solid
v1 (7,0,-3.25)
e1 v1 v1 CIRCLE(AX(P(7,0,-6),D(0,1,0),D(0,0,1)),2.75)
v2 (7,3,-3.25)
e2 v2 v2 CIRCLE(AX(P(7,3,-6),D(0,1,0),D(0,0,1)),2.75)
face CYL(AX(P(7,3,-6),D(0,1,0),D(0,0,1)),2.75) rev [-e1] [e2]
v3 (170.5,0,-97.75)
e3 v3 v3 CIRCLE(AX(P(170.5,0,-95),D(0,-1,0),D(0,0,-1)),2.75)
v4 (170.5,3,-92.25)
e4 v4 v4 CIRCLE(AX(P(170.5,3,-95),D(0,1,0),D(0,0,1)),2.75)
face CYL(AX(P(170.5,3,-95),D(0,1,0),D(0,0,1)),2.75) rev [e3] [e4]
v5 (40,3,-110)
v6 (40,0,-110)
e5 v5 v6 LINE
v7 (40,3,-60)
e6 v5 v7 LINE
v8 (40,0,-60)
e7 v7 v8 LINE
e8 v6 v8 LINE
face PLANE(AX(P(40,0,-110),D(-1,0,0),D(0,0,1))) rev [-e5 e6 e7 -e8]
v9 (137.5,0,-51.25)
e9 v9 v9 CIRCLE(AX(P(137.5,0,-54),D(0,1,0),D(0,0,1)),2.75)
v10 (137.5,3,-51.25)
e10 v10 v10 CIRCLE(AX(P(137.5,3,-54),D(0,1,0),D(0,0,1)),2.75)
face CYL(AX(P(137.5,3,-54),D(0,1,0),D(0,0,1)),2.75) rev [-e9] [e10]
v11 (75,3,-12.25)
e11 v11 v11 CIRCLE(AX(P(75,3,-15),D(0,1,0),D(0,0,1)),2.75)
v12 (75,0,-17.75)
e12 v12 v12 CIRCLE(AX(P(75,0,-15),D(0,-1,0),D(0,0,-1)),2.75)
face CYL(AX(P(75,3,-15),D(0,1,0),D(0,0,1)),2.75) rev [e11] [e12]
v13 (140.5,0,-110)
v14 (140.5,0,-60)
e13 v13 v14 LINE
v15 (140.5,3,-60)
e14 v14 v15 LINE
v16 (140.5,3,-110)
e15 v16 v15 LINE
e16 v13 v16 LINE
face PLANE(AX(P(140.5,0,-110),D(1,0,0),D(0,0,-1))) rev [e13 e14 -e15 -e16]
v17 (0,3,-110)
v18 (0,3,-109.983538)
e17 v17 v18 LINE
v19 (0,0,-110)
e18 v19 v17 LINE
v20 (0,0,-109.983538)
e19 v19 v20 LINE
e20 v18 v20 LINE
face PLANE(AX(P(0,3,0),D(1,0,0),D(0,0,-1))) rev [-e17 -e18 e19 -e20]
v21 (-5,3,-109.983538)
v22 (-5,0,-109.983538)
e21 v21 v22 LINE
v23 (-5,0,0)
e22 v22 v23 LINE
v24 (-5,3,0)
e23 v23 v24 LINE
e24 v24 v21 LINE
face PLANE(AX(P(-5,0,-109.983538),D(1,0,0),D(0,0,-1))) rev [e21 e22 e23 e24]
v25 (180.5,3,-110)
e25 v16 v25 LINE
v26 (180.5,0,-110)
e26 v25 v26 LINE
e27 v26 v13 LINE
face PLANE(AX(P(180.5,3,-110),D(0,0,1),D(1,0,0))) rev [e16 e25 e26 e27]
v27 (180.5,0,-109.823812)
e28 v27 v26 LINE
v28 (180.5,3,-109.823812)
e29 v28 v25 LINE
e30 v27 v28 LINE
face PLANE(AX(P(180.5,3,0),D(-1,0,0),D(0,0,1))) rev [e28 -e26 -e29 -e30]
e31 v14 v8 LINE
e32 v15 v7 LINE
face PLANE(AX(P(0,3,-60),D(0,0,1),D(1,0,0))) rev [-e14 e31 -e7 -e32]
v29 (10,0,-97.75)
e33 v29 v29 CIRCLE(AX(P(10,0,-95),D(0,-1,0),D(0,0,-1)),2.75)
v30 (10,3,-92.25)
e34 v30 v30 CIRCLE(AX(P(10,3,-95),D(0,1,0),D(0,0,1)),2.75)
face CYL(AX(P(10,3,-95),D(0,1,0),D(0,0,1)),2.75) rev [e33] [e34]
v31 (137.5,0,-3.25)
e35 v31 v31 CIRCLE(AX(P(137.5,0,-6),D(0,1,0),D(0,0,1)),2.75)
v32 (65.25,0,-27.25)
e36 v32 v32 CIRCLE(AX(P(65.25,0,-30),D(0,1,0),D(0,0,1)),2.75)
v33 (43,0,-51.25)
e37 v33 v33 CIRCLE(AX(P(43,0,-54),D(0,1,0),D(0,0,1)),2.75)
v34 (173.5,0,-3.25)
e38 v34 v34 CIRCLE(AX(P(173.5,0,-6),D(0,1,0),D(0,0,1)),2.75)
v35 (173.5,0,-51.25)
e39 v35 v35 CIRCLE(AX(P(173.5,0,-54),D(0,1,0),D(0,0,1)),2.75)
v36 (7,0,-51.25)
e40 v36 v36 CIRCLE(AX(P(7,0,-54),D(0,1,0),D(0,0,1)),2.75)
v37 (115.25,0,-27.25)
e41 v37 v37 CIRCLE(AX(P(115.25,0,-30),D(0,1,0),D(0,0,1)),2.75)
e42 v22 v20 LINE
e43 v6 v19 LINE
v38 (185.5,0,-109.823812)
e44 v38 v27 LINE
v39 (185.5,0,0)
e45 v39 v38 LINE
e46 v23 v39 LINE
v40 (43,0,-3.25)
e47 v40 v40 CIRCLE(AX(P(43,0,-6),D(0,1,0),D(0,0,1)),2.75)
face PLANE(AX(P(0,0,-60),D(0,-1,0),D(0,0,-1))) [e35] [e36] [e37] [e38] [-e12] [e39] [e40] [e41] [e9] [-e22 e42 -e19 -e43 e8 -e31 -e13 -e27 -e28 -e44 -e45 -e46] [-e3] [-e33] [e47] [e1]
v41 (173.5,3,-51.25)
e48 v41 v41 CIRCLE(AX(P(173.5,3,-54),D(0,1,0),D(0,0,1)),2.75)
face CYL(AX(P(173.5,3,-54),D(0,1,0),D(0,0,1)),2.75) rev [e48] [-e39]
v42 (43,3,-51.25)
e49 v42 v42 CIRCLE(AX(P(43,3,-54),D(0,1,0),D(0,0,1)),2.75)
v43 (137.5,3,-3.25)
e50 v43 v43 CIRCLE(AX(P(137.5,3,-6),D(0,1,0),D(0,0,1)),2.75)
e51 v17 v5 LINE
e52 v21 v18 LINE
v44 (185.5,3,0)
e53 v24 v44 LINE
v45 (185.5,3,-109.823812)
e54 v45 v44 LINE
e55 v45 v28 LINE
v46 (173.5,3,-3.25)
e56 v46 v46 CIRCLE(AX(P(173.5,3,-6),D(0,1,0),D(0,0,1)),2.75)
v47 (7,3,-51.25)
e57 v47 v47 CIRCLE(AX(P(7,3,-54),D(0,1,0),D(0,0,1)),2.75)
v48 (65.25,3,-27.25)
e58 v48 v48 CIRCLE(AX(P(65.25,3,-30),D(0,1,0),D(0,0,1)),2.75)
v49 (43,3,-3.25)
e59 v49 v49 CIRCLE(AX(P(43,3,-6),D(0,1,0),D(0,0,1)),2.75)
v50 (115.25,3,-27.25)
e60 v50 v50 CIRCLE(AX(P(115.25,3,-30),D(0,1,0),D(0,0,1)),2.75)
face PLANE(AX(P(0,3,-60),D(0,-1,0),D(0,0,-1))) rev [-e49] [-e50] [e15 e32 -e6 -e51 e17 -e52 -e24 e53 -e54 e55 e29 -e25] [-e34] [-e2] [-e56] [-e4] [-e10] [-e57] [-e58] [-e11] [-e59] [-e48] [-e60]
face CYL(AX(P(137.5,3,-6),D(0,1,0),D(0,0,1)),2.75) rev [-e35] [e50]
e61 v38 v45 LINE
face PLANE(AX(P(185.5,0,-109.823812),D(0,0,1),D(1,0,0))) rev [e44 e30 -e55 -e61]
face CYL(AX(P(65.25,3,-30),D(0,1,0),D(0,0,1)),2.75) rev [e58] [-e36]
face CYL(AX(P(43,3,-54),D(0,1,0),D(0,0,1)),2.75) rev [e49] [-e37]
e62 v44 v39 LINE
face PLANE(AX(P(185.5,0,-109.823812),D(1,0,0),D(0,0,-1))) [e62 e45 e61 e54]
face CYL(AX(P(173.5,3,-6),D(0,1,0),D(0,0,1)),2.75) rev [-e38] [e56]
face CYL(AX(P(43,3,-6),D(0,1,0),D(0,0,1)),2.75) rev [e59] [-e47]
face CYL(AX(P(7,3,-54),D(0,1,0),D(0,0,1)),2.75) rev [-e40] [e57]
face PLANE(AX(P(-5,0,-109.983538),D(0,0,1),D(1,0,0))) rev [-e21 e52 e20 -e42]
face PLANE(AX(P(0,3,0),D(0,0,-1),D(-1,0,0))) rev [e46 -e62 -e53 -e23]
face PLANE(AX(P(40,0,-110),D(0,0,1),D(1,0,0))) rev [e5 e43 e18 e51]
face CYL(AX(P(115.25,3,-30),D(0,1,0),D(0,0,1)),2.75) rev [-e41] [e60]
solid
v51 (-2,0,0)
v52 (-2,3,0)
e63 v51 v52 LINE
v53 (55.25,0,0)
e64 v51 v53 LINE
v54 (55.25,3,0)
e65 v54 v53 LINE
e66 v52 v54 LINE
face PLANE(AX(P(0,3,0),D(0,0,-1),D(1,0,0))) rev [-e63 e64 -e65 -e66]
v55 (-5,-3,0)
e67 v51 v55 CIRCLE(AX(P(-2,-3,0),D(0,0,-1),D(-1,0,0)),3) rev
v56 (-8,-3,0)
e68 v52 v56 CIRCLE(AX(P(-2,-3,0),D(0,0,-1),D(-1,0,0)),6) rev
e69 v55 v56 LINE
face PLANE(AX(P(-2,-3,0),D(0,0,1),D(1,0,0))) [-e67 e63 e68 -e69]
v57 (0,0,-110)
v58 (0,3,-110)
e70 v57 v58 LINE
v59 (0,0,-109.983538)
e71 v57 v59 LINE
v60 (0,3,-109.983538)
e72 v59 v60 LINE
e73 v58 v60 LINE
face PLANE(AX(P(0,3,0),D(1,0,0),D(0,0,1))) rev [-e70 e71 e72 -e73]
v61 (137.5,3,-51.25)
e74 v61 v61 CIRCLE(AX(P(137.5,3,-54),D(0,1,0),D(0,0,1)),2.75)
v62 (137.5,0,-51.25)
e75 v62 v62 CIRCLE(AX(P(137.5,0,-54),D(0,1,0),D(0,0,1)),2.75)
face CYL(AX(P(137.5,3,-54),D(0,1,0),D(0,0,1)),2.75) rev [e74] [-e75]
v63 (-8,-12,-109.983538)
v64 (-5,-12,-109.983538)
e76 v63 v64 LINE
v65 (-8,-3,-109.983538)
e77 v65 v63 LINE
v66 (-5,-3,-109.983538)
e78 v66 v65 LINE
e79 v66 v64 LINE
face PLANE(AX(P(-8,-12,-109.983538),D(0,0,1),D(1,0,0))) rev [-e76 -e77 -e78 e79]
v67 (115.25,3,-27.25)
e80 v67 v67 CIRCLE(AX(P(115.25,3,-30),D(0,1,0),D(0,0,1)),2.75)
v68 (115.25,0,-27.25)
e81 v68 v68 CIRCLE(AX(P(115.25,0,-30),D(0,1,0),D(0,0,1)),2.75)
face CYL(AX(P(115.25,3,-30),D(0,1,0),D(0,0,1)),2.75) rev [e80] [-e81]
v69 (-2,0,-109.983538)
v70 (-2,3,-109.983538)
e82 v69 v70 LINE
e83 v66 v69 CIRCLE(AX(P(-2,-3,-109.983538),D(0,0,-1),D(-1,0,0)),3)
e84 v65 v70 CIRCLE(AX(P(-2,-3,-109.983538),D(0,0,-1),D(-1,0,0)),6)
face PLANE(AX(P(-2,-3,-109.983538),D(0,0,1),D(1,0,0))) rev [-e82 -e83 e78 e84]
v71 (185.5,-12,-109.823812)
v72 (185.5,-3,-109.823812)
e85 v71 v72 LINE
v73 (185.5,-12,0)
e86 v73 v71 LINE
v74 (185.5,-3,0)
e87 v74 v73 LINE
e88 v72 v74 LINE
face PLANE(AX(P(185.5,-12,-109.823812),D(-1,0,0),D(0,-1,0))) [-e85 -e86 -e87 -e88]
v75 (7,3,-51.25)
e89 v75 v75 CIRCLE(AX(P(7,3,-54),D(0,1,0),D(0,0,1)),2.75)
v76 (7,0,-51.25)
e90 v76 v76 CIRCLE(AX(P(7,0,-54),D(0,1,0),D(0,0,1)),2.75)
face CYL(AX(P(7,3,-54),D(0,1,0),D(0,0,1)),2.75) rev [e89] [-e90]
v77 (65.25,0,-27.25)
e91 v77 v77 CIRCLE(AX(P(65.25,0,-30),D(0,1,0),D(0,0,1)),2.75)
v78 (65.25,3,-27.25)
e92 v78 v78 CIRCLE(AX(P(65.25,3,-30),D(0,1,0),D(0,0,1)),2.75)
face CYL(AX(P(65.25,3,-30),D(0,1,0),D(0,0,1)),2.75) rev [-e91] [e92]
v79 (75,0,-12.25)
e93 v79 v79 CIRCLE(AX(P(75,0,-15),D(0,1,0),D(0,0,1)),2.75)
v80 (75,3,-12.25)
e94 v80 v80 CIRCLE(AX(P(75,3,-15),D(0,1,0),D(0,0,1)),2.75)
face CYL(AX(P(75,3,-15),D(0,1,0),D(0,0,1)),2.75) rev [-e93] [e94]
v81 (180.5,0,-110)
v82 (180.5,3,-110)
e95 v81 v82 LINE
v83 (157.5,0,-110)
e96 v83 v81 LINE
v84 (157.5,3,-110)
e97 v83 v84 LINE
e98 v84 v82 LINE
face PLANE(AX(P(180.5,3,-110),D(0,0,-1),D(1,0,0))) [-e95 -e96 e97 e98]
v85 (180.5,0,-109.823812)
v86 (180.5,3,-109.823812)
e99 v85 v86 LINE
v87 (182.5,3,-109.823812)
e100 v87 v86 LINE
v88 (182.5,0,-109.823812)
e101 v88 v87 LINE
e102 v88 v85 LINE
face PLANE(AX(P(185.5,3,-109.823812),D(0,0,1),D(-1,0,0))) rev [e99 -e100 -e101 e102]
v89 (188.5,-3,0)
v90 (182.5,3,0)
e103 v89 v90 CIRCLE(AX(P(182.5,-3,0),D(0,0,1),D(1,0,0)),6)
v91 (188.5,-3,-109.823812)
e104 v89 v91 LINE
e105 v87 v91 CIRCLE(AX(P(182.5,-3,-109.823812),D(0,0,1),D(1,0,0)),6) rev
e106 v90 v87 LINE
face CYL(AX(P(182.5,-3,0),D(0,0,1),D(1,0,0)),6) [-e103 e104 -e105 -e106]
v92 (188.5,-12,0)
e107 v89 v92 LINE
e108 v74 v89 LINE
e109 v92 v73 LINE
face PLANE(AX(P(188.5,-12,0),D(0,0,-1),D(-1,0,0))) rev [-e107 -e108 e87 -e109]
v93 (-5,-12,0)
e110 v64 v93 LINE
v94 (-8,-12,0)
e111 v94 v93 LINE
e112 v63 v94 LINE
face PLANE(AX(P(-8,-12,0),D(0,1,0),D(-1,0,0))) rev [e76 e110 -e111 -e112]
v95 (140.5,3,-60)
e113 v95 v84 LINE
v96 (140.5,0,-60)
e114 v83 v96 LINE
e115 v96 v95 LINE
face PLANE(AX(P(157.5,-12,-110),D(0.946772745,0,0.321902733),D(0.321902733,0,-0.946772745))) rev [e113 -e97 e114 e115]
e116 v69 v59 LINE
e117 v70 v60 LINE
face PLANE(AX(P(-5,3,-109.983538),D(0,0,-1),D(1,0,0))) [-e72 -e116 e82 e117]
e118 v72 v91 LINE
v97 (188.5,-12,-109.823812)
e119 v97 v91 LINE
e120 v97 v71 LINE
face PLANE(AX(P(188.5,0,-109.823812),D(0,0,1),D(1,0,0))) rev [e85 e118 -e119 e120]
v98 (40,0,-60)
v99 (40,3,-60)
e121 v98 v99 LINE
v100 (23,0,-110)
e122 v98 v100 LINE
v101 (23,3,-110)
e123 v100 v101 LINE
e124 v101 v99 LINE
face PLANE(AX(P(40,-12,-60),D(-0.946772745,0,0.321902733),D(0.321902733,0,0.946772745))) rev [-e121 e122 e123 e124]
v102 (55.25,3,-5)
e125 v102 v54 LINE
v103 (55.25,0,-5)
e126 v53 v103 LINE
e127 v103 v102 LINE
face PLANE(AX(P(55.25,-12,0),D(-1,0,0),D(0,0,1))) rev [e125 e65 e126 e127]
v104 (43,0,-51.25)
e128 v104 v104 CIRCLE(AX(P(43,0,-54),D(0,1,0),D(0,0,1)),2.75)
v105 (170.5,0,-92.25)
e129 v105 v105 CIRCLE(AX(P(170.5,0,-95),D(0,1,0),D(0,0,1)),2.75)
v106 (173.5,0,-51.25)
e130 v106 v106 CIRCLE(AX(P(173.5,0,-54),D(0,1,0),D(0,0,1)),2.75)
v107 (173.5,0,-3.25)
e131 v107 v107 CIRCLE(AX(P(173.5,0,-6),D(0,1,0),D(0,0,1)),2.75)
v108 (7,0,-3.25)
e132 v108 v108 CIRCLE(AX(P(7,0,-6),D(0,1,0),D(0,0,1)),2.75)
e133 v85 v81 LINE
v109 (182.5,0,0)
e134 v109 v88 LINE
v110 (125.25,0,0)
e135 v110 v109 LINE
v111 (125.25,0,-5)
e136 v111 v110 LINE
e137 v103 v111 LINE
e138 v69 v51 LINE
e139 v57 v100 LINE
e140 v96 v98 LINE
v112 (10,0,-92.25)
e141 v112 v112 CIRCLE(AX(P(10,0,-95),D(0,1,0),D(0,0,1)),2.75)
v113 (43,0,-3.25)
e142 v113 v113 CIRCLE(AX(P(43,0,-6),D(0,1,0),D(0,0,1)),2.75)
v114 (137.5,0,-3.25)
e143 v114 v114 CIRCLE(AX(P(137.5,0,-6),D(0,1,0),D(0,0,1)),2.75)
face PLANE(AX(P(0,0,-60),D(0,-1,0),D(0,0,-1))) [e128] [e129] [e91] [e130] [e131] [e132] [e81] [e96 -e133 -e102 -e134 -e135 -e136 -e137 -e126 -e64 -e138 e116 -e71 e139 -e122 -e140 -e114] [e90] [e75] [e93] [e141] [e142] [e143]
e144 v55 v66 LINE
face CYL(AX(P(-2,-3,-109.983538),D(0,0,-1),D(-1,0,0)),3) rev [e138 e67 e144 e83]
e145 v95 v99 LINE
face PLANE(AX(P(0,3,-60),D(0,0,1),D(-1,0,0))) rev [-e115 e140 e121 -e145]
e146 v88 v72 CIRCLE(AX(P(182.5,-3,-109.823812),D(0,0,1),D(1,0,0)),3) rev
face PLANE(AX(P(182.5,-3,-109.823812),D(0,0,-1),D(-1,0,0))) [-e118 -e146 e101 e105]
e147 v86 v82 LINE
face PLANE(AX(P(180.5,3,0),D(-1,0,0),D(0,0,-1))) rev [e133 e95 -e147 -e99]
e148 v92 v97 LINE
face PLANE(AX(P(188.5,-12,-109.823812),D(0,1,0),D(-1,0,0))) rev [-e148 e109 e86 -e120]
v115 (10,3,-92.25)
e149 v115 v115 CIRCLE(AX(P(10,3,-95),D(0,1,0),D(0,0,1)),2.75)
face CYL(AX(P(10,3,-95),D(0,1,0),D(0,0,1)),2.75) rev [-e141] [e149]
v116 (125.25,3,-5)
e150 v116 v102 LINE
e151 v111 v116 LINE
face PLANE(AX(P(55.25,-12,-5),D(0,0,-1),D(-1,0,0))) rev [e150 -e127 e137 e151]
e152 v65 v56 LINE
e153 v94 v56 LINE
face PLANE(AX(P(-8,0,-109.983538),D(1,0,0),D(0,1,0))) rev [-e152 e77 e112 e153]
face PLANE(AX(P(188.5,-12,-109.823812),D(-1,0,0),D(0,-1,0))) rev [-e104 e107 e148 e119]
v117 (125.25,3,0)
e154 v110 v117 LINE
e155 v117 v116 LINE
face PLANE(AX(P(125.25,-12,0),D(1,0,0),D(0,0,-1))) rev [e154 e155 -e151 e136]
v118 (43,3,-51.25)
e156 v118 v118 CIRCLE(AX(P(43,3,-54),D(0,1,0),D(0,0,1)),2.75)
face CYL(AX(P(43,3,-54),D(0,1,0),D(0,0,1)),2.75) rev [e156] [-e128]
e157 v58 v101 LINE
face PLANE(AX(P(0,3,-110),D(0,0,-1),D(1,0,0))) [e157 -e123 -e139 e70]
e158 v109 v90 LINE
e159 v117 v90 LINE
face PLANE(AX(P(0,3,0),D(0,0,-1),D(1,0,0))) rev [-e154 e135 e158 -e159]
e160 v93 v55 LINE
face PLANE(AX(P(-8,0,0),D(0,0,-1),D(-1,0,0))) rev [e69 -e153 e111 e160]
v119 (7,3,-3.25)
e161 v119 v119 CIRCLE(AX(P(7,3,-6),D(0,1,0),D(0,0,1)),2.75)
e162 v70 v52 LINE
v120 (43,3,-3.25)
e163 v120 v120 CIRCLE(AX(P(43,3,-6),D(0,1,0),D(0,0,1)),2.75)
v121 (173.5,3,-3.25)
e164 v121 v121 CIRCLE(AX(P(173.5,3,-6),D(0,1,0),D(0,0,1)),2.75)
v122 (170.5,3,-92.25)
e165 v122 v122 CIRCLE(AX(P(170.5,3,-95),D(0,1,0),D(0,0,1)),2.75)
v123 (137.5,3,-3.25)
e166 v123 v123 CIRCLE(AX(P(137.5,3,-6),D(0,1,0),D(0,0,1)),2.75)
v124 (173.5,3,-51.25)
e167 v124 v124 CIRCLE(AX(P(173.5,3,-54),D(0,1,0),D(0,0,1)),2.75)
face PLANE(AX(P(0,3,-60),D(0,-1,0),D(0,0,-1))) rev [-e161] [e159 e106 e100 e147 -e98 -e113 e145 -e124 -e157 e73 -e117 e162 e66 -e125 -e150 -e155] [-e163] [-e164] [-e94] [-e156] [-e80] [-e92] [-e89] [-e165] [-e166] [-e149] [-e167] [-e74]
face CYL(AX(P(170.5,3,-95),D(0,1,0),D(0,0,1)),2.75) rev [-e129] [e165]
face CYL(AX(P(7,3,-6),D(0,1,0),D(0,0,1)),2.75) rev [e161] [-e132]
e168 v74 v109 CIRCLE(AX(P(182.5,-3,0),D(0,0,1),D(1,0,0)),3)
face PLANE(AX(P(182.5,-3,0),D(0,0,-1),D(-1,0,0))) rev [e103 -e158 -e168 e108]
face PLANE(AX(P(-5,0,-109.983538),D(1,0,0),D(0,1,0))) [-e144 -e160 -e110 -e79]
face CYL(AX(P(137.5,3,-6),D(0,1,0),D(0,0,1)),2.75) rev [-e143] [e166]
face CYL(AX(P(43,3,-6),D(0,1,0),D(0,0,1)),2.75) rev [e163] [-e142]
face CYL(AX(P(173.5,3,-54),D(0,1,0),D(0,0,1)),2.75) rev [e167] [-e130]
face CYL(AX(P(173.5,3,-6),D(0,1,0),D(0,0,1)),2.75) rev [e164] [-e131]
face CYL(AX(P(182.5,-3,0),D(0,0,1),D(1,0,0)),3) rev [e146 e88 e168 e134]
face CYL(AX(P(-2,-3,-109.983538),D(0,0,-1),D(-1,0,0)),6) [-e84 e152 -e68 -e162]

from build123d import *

# Parameters (mm, degrees)
SKETCH1_W                    = 180.5
SKETCH1_H                    = 60
BOSS_EXTRUDE1_DEPTH          = 3
F_5_5_5_5_DIAMETER_HOLE1_D   = 5.5
SKETCH4_W                    = 40
SKETCH4_H                    = 3
BOSS_EXTRUDE2_DEPTH          = 50
SKETCH5_W                    = 109.823812377
SKETCH5_H                    = 3
BOSS_EXTRUDE3_DEPTH          = 5
SKETCH6_W                    = 109.983538279
SKETCH6_H                    = 3
BOSS_EXTRUDE4_DEPTH          = 5
F_5_5_5_5_DIAMETER_HOLE2_D   = 5.5
CONVERT_SOLID2_OUTLINE_R     = 2.75
CONVERT_SOLID2_DEPTH         = 3
EDGE_FLANGE1_STRIP_W         = 18
EDGE_FLANGE1_STRIP_H         = 3
EDGE_FLANGE1_STRIP_CUT_DEPTH = 109.983538279
EDGE_FLANGE1_DEPTH           = 109.983538279
EDGE_FLANGE2_STRIP_W         = 18
EDGE_FLANGE2_STRIP_H         = 3
EDGE_FLANGE2_STRIP_CUT_DEPTH = 109.823812377
EDGE_FLANGE2_DEPTH           = 109.823812377
CUT_EXTRUDE1_DEPTH           = 219.762999614
SKETCH23_W                   = 70
SKETCH23_H                   = 5
CUT_EXTRUDE2_DEPTH           = 219.762999614


# Read off the part's stored shape, not the designer's step: Convert-Solid2
# Sheet-metal steps are written as plain solids
with BuildPart() as part:
    # Sketch1 → Boss-Extrude1 (new body)
    with BuildSketch(Plane(origin=(0, 0, 0), x_dir=(1, 0, 0), z_dir=(0, 1, 0))):
        with Locations((90.25, 30)):
            Rectangle(SKETCH1_W, SKETCH1_H)
    extrude(amount=BOSS_EXTRUDE1_DEPTH)

    # Ø5.5 (5.5) Diameter Hole1 (through all)
    with Locations(Plane(origin=(0, 3, 0), x_dir=(-1, 0, 0), z_dir=(0, 1, 0))):
        with Locations((-7, -6), (-43, -6), (-43, -54), (-7, -54), (-115.25, -30), (-137.5, -6), (-173.5, -6), (-173.5, -54), (-137.5, -54), (-65.25, -30)):
            Hole(F_5_5_5_5_DIAMETER_HOLE1_D / 2)

    # Sketch4 → Boss-Extrude2 (add)
    with BuildSketch(Plane(origin=(0, 0, -60), x_dir=(-1, 0, 0), z_dir=(0, 0, -1))):
        with Locations((-160.5, 1.5)):
            Rectangle(SKETCH4_W, SKETCH4_H)
        with Locations((-20, 1.5)):
            Rectangle(SKETCH4_W, SKETCH4_H)
    extrude(amount=BOSS_EXTRUDE2_DEPTH)

    # Sketch5 → Boss-Extrude3 (add)
    with BuildSketch(Plane(origin=(180.5, 0, 0), x_dir=(0, 0, -1), z_dir=(1, 0, 0))):
        with Locations((54.911906189, 1.5)):
            Rectangle(SKETCH5_W, SKETCH5_H)
    extrude(amount=BOSS_EXTRUDE3_DEPTH)

    # Sketch6 → Boss-Extrude4 (add)
    with BuildSketch(Plane.ZY):
        with Locations((-54.99176914, 1.5)):
            Rectangle(SKETCH6_W, SKETCH6_H)
    extrude(amount=BOSS_EXTRUDE4_DEPTH)

    # Ø5.5 (5.5) Diameter Hole2 (through all)
    with Locations(Plane(origin=(0, 3, 0), x_dir=(-1, 0, 0), z_dir=(0, 1, 0))):
        with Locations((-75, -15), (-10, -95), (-170.5, -95)):
            Hole(F_5_5_5_5_DIAMETER_HOLE2_D / 2)


with BuildPart() as body_2:
    # Convert-Solid2 outline → Convert-Solid2 (new body)
    with BuildSketch(Plane(origin=(0, 0, 0), x_dir=(1, 0, 0), z_dir=(0, 1, 0))):
        Polygon((0, 110), (0, 109.983538279), (-5, 109.983538279), (-5, 0), (185.5, 0), (185.5, 109.823812377), (180.5, 109.823812377), (180.5, 110), (140.5, 110), (140.5, 60), (40, 60), (40, 110), align=None)
        with Locations((7, 6)):
            Circle(CONVERT_SOLID2_OUTLINE_R, mode=Mode.SUBTRACT)
        with Locations((43, 6)):
            Circle(CONVERT_SOLID2_OUTLINE_R, mode=Mode.SUBTRACT)
        with Locations((75, 15)):
            Circle(CONVERT_SOLID2_OUTLINE_R, mode=Mode.SUBTRACT)
        with Locations((7, 54)):
            Circle(CONVERT_SOLID2_OUTLINE_R, mode=Mode.SUBTRACT)
        with Locations((65.25, 30)):
            Circle(CONVERT_SOLID2_OUTLINE_R, mode=Mode.SUBTRACT)
        with Locations((43, 54)):
            Circle(CONVERT_SOLID2_OUTLINE_R, mode=Mode.SUBTRACT)
        with Locations((137.5, 6)):
            Circle(CONVERT_SOLID2_OUTLINE_R, mode=Mode.SUBTRACT)
        with Locations((173.5, 6)):
            Circle(CONVERT_SOLID2_OUTLINE_R, mode=Mode.SUBTRACT)
        with Locations((115.25, 30)):
            Circle(CONVERT_SOLID2_OUTLINE_R, mode=Mode.SUBTRACT)
        with Locations((137.5, 54)):
            Circle(CONVERT_SOLID2_OUTLINE_R, mode=Mode.SUBTRACT)
        with Locations((173.5, 54)):
            Circle(CONVERT_SOLID2_OUTLINE_R, mode=Mode.SUBTRACT)
        with Locations((10, 95)):
            Circle(CONVERT_SOLID2_OUTLINE_R, mode=Mode.SUBTRACT)
        with Locations((170.5, 95)):
            Circle(CONVERT_SOLID2_OUTLINE_R, mode=Mode.SUBTRACT)
    extrude(amount=CONVERT_SOLID2_DEPTH)

    # Edge-Flange1 strip (across the edge) → Edge-Flange1 strip cut (cut)
    with BuildSketch(Plane(origin=(-5, 0, 0), x_dir=(1, 0, 0), z_dir=(0, 0, -1))):
        with Locations((-6, -1.5)):
            Rectangle(EDGE_FLANGE1_STRIP_W, EDGE_FLANGE1_STRIP_H)
    extrude(amount=EDGE_FLANGE1_STRIP_CUT_DEPTH, mode=Mode.SUBTRACT)

    # Edge-Flange1 section (across the edge) → Edge-Flange1 (add)
    with BuildSketch(Plane(origin=(-5, 0, 0), x_dir=(1, 0, 0), z_dir=(0, 0, -1))):
        with BuildLine():
            Line((-3, 3), (-3, 12))
            Line((-3, 12), (0, 12))
            Line((0, 12), (0, 3))
            ThreePointArc((0, 3), (0.878679656, 0.878679656), (3, 0))
            Line((3, 0), (3, -3))
            ThreePointArc((3, -3), (-1.242640687, -1.242640687), (-3, 3))
        make_face()
    extrude(amount=EDGE_FLANGE1_DEPTH)

    # Edge-Flange2 strip (across the edge) → Edge-Flange2 strip cut (cut)
    with BuildSketch(Plane(origin=(185.5, 0, -109.823812377), x_dir=(-1, 0, 0), z_dir=(0, 0, 1))):
        with Locations((-6, -1.5)):
            Rectangle(EDGE_FLANGE2_STRIP_W, EDGE_FLANGE2_STRIP_H)
    extrude(amount=EDGE_FLANGE2_STRIP_CUT_DEPTH, mode=Mode.SUBTRACT)

    # Edge-Flange2 section (across the edge) → Edge-Flange2 (add)
    with BuildSketch(Plane(origin=(185.5, 0, -109.823812377), x_dir=(-1, 0, 0), z_dir=(0, 0, 1))):
        with BuildLine():
            Line((-3, 3), (-3, 12))
            Line((-3, 12), (0, 12))
            Line((0, 12), (0, 3))
            ThreePointArc((0, 3), (0.878679656, 0.878679656), (3, 0))
            Line((3, 0), (3, -3))
            ThreePointArc((3, -3), (-1.242640687, -1.242640687), (-3, 3))
        make_face()
    extrude(amount=EDGE_FLANGE2_DEPTH)

    # Sketch22 → Cut-Extrude1 (cut, through all)
    with BuildSketch(Plane(origin=(0, 3, 0), x_dir=(1, 0, 0), z_dir=(0, 1, 0))):
        Polygon((40, 60), (23, 110), (40, 110), align=None)
        Polygon((140.5, 60), (140.5, 110), (157.5, 110), align=None)
    extrude(amount=-CUT_EXTRUDE1_DEPTH, mode=Mode.SUBTRACT)

    # Sketch23 → Cut-Extrude2 (cut, through all)
    with BuildSketch(Plane(origin=(0, 3, 0), x_dir=(1, 0, 0), z_dir=(0, 1, 0))):
        with Locations((90.25, 2.5)):
            Rectangle(SKETCH23_W, SKETCH23_H)
    extrude(amount=-CUT_EXTRUDE2_DEPTH, mode=Mode.SUBTRACT)


solid = Compound([part.part, body_2.part])
